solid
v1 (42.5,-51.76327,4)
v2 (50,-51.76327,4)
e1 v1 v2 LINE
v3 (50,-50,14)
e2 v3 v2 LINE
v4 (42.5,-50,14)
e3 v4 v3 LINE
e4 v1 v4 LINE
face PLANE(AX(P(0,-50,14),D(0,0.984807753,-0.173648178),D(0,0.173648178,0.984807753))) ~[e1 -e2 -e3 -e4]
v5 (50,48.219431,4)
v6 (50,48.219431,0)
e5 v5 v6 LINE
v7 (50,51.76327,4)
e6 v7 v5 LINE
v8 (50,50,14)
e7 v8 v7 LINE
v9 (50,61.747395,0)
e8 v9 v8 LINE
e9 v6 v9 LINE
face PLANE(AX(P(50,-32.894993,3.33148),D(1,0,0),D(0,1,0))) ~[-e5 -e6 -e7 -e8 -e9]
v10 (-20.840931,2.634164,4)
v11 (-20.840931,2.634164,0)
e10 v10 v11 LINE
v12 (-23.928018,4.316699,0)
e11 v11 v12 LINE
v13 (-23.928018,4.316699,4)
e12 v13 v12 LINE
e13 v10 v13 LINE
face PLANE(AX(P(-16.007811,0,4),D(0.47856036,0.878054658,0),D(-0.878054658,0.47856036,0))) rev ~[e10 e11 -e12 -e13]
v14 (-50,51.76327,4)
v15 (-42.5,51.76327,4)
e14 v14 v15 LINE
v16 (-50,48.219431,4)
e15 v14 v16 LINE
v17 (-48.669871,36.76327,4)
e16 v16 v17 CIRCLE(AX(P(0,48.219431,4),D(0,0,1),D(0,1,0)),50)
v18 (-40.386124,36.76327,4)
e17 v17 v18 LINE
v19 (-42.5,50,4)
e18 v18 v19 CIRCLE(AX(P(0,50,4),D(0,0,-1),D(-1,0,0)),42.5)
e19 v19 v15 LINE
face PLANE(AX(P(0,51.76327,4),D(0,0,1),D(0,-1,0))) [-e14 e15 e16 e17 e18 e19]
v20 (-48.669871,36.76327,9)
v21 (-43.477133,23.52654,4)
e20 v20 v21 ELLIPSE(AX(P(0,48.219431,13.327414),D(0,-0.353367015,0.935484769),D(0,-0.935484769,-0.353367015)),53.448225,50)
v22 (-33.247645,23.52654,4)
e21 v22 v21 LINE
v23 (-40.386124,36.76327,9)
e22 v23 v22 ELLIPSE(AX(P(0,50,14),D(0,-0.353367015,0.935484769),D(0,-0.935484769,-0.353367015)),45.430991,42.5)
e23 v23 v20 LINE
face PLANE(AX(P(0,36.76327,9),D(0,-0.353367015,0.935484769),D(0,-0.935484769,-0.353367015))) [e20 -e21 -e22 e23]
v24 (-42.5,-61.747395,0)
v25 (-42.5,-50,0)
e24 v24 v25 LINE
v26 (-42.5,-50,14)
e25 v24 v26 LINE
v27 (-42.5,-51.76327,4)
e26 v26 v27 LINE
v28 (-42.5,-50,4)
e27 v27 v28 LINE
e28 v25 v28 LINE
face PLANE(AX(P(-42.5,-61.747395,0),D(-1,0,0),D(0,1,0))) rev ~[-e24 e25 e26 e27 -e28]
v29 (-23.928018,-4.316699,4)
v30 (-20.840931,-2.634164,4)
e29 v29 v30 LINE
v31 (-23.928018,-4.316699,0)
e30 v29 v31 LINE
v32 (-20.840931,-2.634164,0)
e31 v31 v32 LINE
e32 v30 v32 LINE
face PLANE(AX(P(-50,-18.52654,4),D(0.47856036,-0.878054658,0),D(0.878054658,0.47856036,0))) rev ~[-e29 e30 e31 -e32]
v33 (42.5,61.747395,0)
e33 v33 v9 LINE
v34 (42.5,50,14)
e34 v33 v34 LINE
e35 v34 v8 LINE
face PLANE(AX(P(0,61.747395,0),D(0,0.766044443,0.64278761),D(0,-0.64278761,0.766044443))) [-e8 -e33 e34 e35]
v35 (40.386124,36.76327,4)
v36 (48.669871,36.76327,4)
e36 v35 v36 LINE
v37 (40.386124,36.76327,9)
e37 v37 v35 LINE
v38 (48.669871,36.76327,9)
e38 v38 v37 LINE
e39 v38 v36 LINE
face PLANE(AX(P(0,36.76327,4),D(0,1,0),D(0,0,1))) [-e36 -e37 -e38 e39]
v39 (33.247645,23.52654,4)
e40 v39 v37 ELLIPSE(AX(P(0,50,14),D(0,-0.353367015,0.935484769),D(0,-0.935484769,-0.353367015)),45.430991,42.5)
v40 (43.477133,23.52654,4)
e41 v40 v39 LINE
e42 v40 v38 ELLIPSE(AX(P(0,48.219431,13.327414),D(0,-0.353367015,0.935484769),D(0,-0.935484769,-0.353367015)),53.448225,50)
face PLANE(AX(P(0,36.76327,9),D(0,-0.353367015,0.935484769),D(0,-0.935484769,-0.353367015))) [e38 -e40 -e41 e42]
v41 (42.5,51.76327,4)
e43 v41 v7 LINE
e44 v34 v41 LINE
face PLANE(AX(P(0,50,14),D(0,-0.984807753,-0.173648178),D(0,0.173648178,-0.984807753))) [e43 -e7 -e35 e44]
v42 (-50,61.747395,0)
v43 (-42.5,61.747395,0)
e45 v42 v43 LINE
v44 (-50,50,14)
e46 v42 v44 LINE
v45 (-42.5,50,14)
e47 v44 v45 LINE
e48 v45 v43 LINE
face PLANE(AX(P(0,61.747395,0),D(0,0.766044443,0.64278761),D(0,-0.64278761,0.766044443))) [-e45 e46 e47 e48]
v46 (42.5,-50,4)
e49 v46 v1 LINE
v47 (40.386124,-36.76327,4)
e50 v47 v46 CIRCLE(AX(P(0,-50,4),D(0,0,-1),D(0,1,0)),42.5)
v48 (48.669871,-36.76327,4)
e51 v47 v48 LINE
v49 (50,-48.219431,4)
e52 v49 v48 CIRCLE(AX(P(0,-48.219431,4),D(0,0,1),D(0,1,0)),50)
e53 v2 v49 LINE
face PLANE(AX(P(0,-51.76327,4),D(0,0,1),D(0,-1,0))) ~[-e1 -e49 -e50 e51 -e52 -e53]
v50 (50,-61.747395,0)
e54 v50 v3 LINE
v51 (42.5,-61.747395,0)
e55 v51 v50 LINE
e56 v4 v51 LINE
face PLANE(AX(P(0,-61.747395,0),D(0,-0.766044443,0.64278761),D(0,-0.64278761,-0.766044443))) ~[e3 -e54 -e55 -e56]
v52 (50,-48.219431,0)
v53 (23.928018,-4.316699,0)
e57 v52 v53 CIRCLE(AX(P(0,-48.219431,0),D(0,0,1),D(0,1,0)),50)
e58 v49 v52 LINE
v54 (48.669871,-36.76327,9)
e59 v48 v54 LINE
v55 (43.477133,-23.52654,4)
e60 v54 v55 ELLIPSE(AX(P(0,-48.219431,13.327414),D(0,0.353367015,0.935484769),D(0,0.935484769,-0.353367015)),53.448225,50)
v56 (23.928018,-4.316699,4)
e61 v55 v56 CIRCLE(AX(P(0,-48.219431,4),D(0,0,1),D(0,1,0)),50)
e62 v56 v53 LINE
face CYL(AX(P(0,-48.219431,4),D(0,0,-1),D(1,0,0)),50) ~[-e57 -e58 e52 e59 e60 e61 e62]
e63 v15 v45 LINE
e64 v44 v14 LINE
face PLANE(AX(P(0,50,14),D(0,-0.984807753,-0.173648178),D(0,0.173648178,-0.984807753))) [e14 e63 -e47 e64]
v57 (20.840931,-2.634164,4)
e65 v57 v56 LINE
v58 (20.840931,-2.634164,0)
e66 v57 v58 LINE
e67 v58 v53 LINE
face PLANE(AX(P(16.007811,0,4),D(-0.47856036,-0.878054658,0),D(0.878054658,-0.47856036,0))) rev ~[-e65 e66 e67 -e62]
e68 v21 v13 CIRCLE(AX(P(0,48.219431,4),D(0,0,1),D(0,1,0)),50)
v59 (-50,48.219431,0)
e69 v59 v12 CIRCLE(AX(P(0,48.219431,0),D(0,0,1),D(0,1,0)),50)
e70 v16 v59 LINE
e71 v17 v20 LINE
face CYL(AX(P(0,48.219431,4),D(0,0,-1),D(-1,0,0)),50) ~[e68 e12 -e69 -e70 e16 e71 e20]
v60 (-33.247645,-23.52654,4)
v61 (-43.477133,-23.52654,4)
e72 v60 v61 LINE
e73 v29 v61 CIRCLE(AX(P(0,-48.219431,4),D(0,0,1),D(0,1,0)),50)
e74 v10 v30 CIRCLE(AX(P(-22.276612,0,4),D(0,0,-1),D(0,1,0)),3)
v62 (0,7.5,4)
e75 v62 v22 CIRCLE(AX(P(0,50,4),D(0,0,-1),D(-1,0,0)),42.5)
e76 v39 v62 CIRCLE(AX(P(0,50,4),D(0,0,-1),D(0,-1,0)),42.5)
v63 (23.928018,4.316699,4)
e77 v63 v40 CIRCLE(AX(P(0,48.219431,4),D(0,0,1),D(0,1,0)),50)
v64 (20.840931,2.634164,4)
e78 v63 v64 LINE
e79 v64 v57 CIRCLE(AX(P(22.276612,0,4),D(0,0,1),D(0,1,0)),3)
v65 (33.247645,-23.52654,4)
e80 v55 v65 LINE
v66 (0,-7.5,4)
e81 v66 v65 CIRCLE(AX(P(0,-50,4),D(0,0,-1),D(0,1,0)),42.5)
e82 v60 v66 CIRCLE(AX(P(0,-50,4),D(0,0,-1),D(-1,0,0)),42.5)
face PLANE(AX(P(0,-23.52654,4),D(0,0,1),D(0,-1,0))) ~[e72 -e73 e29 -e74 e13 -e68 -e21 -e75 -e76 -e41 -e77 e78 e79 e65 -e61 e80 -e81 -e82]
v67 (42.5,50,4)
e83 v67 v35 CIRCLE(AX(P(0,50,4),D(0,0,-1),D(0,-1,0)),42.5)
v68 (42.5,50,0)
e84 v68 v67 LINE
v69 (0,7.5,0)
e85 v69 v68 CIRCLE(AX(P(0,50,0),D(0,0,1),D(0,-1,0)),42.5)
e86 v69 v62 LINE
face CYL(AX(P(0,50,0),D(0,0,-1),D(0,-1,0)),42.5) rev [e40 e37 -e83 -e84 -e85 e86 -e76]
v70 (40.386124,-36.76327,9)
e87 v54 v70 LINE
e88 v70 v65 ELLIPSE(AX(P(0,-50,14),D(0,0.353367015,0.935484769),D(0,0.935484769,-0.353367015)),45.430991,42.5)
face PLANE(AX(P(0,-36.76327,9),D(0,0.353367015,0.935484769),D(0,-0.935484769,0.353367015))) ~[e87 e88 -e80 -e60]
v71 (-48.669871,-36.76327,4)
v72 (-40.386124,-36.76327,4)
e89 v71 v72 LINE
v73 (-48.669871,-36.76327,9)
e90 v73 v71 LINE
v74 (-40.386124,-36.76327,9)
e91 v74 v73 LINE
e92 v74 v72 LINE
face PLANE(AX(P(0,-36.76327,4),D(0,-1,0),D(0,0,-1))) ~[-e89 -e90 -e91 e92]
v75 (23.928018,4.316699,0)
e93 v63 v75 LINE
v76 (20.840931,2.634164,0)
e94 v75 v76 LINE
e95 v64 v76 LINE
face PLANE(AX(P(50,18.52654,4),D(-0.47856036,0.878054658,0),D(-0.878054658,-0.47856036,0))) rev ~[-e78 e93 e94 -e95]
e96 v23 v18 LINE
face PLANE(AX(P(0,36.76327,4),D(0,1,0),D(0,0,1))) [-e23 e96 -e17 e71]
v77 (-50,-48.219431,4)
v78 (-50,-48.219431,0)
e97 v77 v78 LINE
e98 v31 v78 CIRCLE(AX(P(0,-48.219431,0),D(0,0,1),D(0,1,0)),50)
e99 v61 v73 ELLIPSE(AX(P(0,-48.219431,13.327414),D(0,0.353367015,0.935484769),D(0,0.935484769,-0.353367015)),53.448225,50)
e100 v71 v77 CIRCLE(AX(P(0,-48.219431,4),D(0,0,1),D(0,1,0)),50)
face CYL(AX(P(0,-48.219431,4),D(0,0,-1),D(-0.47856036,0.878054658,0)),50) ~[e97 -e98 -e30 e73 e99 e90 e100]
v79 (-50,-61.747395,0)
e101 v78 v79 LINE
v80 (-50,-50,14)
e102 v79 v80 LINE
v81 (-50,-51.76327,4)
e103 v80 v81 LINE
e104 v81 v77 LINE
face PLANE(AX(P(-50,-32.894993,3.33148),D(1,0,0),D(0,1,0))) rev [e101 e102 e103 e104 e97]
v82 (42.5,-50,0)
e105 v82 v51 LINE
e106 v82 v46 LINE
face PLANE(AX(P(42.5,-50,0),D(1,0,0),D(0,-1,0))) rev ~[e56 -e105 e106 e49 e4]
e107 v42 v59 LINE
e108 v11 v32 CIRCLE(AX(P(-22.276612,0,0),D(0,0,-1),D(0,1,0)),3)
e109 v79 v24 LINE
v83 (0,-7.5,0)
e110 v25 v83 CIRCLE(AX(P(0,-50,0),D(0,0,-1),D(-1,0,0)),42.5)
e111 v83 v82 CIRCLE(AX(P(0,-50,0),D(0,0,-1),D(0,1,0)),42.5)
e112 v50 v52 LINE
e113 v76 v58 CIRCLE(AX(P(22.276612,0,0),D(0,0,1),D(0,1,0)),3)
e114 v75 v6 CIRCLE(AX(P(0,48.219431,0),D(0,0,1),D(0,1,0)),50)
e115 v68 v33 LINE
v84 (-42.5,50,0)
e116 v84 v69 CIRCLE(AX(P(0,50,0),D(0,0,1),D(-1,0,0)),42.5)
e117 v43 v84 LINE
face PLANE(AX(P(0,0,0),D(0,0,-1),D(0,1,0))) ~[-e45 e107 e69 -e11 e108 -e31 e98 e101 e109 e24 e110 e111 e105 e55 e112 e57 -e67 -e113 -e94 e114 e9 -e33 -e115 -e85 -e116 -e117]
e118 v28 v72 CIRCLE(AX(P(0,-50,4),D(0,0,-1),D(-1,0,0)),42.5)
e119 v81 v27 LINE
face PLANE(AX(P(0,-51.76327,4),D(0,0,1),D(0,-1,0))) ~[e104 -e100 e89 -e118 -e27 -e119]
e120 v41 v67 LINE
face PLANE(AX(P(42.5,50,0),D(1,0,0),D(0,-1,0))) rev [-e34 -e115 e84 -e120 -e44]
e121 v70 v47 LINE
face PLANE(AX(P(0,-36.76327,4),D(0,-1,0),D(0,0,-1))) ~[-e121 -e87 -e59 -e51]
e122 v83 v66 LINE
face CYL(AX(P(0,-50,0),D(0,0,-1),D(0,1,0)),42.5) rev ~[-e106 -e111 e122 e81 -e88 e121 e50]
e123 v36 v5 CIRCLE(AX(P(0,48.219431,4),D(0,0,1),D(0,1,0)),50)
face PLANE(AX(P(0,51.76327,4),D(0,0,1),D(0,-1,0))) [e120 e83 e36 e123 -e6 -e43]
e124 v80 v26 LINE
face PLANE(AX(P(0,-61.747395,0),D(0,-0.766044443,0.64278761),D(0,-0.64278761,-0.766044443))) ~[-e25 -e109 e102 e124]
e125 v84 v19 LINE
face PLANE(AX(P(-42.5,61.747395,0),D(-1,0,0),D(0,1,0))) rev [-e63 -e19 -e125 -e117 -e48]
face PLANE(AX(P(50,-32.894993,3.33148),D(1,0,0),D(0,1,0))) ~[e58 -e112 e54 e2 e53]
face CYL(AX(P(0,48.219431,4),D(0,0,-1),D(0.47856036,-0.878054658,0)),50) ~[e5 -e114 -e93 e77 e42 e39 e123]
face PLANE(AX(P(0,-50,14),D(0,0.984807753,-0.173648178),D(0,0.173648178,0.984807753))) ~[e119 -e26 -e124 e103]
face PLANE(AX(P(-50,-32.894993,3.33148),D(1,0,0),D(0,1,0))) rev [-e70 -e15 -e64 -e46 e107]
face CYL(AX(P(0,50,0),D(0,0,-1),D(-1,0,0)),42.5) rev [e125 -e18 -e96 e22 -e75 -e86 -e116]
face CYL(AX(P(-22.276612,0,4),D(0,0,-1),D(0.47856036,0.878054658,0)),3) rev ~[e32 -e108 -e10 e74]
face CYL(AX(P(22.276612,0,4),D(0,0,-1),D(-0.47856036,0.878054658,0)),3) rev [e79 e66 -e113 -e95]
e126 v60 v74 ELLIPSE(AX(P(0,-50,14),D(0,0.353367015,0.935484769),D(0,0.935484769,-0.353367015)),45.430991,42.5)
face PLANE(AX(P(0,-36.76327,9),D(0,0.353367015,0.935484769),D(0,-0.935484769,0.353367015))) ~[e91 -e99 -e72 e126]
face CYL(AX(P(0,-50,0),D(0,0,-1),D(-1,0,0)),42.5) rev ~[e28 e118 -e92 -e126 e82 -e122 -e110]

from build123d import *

# Parameters (mm, degrees)
F1_DEPTH = 50
F4_DEPTH = 14.001
F6_DEPTH = 4
F7_R     = 50
F8_R     = 3


# Not quite as in the source:
# - a pattern or mirror of a feature is missing from the dataset's text; its kind, count and spacing are read off the source's solid


with BuildPart() as f1:
    # F0 (on Right) → F1 (new body, symmetric)
    with BuildSketch(Plane.YZ):
        Polygon((0, 4), (0, 0), (61.7473948365, 0), (50, 14), (51.7632698071, 4), (36.7632698071, 4), (36.7632698071, 9), (23.5265396142, 4), align=None)
    extrude(amount=F1_DEPTH, both=True)

    # F2: F1 across face


with BuildPart() as f1_1:
    add(f1.part)
    add(f1.part.mirror(Plane(origin=(0, 0, 2), x_dir=(1, 0, 0), z_dir=(0, -1, 0))))

    # F3 (on face) → F4 (cut, through all)
    with BuildSketch(Plane(origin=(0, 0, 0), x_dir=(1, 0, 0), z_dir=(0, 0, -1))):
        with BuildLine():
            Line((42.5, 50), (42.5, 61.7473948365))
            Line((42.5, 61.7473948365), (0, 61.7473948365))
            Line((0, 61.7473948365), (-42.5, 61.7473948365))
            Line((-42.5, 61.7473948365), (-42.5, 50))
            ThreePointArc((-42.5, 50), (-30.0520382004, 19.9479617996), (0, 7.5))
            ThreePointArc((0, 7.5), (30.0520382004, 19.9479617996), (42.5, 50))
        make_face()
    f4 = extrude(amount=-F4_DEPTH, mode=Mode.SUBTRACT)

    # F4_copies: F4 across plane
    add(f4.mirror(Plane.ZX), mode=Mode.SUBTRACT)

    # F5 (on face) → F6 (cut, through all)
    with BuildSketch(Plane.XY.offset(4)):
        Polygon((-50, 18.5265396142), (-50, -18.5265396142), (-16.0078105936, 0), align=None)
        Polygon((50, 18.5265396142), (16.0078105936, 0), (50, -18.5265396142), align=None)
    extrude(amount=-F6_DEPTH, mode=Mode.SUBTRACT)

    # F7
    f7_edges = [f1_1.edges().sort_by_distance(p)[0] for p in [
        (50, -18.52654, 2),
        (50, 18.52654, 2),
        (-50, -18.52654, 2),
        (-50, 18.52654, 2),
    ]]
    fillet(f7_edges, radius=F7_R)

    # F8
    f8_edges = [f1_1.edges().sort_by_distance(p)[0] for p in [
        (-16.007811, 0, 2),
        (16.007811, 0, 2),
    ]]
    fillet(f8_edges, radius=F8_R)


solid = f1_1.part
